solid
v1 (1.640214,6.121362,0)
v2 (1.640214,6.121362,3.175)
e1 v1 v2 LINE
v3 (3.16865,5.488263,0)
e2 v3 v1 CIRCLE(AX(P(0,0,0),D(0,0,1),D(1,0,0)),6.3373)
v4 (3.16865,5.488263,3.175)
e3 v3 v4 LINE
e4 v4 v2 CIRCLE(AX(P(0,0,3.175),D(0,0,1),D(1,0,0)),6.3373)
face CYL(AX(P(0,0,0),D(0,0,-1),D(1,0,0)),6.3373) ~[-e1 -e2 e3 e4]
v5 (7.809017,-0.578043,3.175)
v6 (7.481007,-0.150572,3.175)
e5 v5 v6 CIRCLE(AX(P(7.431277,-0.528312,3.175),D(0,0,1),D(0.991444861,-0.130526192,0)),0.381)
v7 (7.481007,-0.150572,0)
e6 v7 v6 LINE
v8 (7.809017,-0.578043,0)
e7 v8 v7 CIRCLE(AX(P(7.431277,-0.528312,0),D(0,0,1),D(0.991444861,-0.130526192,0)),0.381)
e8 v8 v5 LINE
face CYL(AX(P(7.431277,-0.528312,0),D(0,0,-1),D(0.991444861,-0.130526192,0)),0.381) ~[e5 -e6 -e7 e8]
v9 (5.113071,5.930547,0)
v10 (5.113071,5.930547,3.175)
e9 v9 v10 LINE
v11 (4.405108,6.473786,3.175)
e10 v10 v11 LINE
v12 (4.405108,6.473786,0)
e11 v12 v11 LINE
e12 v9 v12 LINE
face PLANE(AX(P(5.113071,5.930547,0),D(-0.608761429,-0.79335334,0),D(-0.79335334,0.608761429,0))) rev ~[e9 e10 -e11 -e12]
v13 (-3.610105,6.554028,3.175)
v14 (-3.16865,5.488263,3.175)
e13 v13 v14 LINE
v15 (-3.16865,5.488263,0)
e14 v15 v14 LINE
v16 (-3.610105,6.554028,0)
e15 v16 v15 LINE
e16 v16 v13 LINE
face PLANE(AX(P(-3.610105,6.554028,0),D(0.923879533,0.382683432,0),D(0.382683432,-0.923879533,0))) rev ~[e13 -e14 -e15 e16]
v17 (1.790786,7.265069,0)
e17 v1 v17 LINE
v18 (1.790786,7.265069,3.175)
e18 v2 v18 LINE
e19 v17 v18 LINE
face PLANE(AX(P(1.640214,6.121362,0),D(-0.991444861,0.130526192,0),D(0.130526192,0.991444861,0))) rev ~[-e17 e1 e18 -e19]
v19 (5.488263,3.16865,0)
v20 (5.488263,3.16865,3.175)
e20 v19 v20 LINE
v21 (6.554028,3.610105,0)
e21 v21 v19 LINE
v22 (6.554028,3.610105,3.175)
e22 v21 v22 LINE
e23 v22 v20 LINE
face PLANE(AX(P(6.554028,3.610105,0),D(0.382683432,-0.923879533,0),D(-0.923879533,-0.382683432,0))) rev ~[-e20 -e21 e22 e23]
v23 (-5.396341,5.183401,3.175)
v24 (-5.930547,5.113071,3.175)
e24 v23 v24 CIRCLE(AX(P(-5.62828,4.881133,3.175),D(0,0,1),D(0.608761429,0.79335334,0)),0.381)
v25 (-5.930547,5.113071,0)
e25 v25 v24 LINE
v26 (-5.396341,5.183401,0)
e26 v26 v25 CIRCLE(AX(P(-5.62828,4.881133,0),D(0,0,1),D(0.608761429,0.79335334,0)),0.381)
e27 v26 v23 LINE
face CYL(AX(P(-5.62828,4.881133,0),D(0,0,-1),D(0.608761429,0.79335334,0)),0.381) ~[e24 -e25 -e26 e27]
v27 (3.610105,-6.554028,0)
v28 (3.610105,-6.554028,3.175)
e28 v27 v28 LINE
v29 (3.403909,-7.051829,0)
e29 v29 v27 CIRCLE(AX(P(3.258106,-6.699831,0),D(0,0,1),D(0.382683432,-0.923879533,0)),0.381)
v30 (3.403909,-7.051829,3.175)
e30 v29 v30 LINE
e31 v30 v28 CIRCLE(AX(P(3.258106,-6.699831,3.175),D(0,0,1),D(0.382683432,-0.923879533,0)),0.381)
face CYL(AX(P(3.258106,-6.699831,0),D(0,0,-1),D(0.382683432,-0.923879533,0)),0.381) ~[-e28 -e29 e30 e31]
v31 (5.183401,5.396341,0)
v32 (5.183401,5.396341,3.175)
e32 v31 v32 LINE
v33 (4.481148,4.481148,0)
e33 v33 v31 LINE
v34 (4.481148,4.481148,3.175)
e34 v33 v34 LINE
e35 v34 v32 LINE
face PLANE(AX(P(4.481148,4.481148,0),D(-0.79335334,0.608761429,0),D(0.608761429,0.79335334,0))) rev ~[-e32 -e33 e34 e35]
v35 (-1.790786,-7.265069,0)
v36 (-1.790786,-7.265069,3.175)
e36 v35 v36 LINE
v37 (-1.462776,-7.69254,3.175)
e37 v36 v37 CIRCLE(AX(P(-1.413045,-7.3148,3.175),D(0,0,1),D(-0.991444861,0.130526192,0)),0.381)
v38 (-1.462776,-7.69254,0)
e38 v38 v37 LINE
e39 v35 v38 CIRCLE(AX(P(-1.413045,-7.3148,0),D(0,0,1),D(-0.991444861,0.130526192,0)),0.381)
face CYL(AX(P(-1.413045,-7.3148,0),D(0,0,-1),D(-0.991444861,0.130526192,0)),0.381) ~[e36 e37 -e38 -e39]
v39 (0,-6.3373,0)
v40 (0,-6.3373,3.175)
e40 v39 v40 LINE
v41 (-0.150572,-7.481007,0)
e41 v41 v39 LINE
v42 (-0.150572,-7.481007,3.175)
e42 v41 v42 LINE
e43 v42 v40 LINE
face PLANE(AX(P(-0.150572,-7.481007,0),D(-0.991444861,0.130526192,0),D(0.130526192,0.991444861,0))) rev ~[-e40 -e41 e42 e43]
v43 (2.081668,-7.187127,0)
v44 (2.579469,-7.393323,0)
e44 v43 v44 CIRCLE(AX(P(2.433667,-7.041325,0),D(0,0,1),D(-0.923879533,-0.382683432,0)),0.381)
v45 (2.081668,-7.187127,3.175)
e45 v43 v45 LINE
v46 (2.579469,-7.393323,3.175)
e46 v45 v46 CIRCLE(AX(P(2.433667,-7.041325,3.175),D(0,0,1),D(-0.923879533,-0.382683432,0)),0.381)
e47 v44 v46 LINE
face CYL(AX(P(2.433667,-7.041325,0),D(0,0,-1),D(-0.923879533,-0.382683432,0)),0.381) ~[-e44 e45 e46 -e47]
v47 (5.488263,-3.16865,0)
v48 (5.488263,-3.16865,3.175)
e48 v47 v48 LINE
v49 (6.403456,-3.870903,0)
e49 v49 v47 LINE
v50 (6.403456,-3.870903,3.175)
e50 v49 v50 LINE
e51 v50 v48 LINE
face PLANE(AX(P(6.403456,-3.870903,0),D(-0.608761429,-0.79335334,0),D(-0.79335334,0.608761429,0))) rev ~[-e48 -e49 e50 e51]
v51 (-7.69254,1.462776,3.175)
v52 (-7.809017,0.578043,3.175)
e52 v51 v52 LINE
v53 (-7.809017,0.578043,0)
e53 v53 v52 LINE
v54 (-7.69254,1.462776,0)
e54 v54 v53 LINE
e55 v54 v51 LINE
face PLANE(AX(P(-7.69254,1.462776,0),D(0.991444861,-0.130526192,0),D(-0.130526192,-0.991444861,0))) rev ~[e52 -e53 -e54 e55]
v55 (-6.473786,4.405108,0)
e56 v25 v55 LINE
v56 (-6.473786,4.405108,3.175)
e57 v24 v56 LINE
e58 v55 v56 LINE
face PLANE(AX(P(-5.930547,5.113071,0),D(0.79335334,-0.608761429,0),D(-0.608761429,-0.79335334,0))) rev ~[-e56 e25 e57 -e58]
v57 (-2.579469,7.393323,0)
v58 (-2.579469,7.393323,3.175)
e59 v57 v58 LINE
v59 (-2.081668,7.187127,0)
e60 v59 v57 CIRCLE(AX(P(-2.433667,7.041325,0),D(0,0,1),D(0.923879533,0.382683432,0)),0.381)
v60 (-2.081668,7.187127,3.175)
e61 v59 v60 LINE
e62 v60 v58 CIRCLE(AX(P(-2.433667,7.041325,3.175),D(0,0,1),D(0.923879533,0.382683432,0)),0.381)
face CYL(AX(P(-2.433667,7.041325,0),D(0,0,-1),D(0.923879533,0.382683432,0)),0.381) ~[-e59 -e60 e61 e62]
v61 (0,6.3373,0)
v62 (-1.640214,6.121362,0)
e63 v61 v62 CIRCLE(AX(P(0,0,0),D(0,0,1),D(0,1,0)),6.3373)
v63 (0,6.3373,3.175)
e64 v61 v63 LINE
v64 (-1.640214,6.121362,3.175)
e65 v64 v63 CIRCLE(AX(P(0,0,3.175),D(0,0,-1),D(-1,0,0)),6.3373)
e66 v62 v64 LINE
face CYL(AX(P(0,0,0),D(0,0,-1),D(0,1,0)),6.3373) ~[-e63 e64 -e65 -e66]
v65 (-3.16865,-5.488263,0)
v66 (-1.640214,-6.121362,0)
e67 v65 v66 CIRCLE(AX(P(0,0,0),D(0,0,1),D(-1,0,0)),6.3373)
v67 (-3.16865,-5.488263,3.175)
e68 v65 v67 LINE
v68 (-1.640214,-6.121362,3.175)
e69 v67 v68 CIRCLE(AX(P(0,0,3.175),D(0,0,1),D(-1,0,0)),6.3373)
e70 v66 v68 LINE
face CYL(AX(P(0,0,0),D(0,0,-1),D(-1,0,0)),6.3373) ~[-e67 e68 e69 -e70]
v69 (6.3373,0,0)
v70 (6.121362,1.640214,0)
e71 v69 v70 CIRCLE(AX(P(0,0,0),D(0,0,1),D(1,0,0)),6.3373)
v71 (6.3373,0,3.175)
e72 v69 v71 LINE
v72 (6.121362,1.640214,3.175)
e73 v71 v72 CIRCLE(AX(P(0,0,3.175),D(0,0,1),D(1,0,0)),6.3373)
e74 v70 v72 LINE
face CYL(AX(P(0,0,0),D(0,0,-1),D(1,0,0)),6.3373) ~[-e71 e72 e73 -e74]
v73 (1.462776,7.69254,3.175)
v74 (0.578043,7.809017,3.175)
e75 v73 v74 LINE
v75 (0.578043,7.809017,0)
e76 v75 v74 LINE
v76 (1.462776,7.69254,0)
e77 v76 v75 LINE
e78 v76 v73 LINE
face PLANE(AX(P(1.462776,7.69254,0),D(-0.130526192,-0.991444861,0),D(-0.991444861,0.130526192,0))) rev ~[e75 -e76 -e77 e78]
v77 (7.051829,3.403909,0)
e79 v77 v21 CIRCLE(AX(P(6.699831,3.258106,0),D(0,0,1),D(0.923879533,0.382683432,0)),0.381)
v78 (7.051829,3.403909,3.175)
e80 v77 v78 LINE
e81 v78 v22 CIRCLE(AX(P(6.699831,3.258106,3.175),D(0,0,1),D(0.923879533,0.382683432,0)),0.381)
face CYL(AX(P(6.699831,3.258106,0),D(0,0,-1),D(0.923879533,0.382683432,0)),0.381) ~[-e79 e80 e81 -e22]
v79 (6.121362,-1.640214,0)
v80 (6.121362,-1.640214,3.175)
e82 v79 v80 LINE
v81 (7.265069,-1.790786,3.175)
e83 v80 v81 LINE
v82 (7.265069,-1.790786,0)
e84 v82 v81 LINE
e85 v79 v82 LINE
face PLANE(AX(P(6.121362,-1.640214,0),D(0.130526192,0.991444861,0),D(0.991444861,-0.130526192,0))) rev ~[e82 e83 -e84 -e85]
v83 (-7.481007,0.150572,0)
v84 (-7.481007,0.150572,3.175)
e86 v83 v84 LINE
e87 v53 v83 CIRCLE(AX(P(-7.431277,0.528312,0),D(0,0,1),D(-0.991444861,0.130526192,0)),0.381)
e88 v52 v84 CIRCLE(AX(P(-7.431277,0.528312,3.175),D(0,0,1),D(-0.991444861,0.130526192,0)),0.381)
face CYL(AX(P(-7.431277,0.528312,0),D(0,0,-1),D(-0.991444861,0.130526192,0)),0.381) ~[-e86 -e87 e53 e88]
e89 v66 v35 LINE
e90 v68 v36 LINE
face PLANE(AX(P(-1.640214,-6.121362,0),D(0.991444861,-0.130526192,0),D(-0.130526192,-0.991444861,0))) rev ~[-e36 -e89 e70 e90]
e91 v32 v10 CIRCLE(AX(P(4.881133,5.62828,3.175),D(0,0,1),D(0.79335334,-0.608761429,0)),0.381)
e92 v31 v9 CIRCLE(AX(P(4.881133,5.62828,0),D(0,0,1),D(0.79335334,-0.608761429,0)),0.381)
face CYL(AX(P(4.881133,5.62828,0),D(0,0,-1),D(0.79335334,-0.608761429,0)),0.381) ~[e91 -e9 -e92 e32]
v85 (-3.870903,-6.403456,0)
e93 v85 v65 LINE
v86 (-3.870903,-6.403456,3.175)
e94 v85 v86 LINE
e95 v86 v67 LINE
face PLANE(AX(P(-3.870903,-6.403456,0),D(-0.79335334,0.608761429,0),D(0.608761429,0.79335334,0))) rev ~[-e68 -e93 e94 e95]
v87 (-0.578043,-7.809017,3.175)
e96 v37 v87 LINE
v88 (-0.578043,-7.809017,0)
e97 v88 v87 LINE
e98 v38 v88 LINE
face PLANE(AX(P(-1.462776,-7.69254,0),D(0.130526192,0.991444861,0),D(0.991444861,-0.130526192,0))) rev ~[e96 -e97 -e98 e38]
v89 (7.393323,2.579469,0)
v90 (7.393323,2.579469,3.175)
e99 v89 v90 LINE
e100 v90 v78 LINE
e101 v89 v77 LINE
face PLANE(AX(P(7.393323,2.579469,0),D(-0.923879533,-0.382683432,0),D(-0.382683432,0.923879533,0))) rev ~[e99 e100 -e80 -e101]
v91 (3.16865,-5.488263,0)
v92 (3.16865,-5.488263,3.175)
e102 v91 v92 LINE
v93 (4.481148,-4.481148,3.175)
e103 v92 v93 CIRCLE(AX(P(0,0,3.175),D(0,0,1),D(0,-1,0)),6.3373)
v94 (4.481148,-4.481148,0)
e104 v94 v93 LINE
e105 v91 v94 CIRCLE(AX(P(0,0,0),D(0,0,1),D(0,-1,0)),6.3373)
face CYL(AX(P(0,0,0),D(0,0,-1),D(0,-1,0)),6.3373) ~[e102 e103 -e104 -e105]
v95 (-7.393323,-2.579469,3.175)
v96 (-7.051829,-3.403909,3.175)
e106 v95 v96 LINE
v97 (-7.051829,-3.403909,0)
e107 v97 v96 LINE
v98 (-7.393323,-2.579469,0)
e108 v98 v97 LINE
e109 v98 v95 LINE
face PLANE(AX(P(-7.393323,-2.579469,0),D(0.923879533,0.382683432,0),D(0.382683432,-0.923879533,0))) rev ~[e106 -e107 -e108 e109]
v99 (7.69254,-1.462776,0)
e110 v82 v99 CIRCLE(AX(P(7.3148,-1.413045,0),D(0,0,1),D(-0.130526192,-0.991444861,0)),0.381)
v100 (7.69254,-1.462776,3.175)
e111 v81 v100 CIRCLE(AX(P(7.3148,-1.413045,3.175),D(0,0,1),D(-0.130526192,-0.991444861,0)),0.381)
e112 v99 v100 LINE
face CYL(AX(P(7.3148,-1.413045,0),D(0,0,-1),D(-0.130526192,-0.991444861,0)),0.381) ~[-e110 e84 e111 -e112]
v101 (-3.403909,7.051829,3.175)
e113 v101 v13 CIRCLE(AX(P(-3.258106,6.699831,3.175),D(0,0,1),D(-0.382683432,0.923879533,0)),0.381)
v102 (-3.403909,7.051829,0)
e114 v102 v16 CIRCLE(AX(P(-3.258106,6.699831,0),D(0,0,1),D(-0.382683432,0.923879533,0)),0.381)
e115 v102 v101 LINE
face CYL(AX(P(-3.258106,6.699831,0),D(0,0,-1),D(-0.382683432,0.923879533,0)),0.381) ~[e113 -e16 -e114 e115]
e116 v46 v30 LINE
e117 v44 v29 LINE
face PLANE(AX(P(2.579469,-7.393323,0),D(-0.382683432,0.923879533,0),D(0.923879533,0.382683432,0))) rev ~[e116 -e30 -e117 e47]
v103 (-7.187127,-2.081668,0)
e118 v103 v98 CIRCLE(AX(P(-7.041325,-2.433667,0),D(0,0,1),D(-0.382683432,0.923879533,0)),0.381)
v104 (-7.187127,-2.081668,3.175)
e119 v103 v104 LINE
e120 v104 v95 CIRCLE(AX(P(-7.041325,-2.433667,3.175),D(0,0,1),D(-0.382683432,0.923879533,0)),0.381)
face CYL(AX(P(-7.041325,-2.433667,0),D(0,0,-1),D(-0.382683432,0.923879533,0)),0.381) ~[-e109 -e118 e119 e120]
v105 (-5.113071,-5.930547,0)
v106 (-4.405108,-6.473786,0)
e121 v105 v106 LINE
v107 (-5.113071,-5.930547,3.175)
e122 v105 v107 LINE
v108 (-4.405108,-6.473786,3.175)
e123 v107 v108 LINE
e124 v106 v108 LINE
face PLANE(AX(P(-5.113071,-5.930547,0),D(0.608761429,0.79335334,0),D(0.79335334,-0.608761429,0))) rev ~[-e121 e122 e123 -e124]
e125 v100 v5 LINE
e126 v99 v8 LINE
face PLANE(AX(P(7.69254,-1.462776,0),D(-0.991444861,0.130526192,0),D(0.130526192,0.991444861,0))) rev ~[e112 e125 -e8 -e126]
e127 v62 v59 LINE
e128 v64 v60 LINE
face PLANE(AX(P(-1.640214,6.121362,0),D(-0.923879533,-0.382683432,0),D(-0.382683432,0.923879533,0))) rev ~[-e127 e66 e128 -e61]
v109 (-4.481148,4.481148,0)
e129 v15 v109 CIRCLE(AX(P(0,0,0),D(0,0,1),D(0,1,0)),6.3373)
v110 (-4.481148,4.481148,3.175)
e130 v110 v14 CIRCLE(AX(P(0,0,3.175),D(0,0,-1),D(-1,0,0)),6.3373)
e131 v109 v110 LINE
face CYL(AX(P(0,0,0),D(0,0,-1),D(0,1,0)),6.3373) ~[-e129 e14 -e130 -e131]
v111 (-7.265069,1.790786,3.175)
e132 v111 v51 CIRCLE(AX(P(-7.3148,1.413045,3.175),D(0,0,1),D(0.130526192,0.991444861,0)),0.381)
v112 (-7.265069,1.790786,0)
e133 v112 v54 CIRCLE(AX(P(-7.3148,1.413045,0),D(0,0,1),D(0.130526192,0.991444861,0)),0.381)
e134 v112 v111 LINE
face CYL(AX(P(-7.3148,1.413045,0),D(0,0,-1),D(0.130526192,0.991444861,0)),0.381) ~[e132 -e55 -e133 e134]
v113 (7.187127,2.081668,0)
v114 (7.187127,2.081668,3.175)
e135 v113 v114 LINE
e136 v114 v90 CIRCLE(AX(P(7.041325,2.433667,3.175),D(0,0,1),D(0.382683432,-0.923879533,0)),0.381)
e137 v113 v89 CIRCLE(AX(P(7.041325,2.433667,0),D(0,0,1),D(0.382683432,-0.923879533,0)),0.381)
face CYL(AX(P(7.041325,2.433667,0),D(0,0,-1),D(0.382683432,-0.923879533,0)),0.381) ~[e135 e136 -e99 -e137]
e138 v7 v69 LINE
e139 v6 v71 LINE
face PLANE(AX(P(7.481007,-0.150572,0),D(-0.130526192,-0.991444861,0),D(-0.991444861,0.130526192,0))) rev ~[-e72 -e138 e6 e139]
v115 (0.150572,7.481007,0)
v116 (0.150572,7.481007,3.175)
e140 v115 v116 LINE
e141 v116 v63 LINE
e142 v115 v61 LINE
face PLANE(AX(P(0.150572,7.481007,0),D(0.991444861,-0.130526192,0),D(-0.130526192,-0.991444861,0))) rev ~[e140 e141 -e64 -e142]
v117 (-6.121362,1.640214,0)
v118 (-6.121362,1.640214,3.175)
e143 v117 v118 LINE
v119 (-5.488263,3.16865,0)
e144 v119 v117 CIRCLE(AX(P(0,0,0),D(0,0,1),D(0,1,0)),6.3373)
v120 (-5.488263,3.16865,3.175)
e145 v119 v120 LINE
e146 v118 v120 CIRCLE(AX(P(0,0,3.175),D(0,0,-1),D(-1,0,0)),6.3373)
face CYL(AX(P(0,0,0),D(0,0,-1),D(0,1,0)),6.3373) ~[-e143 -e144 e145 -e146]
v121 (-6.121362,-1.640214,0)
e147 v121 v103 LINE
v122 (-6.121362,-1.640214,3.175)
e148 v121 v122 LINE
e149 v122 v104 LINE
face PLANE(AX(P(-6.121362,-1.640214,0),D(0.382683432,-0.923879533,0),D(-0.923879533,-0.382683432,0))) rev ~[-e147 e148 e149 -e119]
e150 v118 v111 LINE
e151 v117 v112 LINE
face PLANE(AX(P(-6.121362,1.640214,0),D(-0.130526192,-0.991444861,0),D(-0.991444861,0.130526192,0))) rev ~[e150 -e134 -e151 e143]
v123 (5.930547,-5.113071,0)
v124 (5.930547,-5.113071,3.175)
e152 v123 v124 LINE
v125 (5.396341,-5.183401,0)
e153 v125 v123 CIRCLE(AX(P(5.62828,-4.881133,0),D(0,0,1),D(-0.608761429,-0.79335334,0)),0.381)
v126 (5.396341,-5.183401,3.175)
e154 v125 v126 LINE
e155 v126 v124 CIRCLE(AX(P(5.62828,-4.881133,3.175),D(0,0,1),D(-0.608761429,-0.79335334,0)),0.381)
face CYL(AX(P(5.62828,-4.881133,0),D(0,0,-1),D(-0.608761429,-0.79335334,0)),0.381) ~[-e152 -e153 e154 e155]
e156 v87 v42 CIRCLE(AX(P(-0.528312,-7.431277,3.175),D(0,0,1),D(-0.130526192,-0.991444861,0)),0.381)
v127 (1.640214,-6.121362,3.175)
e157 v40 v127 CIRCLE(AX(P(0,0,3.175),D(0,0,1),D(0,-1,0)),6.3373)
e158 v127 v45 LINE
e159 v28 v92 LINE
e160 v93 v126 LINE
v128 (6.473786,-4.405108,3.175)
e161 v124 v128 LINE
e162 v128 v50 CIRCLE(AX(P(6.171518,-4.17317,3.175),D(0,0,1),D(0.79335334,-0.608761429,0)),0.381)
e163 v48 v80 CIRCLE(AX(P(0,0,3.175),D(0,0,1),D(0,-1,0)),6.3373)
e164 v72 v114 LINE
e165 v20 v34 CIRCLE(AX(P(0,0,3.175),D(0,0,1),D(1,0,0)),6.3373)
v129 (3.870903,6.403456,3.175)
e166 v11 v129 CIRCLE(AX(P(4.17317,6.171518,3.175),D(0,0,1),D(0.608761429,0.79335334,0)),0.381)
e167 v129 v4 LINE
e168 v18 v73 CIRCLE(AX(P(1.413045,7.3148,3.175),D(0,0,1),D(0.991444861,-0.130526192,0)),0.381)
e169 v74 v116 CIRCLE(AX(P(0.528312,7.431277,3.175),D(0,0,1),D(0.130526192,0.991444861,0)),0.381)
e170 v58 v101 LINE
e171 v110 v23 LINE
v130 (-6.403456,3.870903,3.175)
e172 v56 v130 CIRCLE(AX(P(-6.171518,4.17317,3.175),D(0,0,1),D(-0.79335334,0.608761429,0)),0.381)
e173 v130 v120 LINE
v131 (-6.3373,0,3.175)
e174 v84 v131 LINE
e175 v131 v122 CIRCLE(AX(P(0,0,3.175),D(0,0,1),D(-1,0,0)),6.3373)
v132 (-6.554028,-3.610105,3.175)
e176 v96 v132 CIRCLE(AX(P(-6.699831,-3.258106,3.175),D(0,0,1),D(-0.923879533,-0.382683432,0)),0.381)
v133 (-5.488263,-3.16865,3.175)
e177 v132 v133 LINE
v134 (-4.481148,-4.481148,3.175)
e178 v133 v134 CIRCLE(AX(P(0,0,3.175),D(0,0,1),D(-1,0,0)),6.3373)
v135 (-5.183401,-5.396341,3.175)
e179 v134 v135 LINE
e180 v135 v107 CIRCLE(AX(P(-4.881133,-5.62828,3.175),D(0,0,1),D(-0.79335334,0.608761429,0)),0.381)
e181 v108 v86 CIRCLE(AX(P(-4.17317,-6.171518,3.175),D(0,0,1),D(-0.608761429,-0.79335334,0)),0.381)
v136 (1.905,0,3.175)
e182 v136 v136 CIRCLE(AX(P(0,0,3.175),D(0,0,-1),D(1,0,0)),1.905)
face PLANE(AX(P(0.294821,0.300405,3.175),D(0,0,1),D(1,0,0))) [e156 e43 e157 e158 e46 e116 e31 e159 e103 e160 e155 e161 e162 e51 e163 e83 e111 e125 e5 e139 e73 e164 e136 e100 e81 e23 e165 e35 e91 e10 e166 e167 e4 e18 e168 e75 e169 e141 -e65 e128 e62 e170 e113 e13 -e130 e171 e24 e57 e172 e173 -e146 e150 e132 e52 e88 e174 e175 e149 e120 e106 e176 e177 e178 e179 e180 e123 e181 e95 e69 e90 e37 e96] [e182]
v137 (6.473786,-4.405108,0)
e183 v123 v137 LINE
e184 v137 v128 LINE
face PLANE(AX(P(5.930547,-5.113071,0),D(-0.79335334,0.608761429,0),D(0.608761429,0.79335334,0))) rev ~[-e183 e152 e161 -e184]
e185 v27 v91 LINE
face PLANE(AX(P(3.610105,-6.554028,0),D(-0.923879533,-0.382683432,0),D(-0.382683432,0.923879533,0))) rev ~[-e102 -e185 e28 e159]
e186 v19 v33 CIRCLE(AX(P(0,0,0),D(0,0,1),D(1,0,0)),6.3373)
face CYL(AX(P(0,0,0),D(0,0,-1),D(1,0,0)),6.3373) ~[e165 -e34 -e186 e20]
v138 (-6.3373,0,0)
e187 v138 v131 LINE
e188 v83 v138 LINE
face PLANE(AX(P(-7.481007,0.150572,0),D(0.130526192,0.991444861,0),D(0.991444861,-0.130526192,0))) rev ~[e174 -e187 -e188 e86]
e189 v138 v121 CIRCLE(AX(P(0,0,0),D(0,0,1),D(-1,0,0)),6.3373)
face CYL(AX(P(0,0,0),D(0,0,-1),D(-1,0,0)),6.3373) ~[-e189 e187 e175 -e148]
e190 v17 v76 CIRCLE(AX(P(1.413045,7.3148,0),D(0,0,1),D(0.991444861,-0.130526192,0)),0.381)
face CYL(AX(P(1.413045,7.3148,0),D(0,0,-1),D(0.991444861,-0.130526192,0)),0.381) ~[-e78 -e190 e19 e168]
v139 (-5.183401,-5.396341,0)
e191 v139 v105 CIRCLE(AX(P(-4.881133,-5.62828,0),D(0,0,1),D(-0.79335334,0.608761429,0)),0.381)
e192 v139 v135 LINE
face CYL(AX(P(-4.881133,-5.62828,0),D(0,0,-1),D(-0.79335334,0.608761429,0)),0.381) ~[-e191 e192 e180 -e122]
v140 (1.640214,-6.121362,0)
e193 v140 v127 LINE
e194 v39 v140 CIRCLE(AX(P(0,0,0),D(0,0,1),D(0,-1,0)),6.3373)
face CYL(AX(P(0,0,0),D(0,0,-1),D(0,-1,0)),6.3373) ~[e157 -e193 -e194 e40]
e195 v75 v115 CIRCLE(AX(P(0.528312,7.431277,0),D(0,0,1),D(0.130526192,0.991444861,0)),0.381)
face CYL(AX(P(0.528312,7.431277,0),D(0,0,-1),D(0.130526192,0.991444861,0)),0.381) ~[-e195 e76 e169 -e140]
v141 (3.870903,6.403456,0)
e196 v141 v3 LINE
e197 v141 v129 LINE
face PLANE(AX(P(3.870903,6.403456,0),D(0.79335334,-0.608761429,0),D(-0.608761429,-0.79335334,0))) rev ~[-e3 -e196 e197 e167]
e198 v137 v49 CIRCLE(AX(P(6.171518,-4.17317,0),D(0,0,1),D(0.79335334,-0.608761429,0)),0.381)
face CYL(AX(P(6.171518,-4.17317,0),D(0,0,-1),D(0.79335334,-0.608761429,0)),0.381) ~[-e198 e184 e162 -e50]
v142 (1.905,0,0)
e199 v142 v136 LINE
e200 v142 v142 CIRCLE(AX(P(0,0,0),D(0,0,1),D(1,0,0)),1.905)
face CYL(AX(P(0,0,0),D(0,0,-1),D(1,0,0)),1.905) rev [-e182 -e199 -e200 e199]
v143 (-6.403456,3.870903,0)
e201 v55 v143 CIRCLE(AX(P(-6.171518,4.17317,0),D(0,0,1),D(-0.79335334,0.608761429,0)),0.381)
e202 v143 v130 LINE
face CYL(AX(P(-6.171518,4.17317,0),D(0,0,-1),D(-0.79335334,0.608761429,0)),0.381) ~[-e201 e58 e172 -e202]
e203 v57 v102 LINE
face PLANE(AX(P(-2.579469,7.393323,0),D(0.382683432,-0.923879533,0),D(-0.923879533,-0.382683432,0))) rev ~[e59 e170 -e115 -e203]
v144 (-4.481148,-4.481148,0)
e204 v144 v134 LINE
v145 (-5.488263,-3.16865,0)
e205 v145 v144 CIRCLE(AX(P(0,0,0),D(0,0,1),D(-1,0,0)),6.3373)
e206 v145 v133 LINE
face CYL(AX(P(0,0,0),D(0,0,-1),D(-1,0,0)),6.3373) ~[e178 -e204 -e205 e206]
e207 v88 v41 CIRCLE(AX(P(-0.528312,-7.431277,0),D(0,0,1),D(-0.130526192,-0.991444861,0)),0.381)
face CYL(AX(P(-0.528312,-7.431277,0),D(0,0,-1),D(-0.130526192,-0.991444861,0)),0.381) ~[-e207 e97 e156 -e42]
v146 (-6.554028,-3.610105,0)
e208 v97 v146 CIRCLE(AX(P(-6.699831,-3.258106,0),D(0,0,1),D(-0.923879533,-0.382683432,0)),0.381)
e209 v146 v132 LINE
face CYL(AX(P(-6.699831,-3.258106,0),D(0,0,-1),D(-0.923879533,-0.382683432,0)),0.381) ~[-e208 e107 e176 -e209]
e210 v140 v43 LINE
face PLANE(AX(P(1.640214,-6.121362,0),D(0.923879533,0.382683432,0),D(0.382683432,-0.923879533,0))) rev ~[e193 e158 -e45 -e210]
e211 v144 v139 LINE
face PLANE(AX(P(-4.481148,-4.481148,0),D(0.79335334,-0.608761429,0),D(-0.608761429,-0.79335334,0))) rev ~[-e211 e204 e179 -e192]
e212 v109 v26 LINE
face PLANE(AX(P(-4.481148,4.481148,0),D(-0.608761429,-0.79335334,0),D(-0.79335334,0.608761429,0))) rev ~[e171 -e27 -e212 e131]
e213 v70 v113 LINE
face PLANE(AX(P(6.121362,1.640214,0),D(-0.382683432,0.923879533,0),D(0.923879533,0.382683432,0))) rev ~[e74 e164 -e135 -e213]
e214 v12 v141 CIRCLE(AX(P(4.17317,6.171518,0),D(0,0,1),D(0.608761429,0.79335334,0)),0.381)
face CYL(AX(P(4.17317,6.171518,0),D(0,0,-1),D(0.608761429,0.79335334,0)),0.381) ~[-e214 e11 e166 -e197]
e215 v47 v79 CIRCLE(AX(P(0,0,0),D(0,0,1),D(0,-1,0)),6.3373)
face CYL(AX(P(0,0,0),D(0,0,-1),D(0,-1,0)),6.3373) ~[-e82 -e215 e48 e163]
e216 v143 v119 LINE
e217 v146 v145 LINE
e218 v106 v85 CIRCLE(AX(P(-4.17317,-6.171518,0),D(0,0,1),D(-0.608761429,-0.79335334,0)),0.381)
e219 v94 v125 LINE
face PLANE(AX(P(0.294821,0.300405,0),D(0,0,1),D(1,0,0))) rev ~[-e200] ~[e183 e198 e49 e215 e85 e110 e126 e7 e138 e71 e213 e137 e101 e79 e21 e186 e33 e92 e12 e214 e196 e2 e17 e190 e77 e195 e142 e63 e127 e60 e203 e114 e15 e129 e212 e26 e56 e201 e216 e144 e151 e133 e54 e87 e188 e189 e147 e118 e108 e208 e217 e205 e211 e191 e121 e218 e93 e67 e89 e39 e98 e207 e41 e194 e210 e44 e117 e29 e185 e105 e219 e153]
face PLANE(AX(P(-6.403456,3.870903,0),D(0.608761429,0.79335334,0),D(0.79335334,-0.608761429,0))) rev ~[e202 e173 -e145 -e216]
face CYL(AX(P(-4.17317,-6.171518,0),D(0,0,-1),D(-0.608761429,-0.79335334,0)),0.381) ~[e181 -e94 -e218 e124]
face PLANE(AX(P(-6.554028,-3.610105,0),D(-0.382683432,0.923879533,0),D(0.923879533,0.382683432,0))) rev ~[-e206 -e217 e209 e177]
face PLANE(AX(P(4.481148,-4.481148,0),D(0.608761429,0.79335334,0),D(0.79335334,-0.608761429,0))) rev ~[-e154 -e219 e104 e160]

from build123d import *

# Parameters (mm, degrees)
F0_R     = 1.905
F1_DEPTH = 3.175
F2_COUNT = 12


# Not quite as in the source:
# - a length typed as a fraction of an inch, garbled in the dataset ("3 / 203.2 mm" for 3/8 in), is restored


with BuildPart() as f1:
    # F0 (on Top) → F1 (new body)
    with BuildSketch(Plane.XY):
        with BuildLine():
            ThreePointArc((0, 6.3373), (-4.4811478044, -4.4811478044), (6.3373, 0))
            ThreePointArc((6.3373, 0), (5.0277181234, 3.8579038041), (1.6402139345, 6.1213617389))
            ThreePointArc((1.6402139345, 6.1213617389), (0.827183638, 6.28308352), (0, 6.3373))
        make_face()
        Circle(F0_R, mode=Mode.SUBTRACT)
        with BuildLine():
            ThreePointArc((0, 6.3373), (0.827183638, 6.28308352), (1.6402139345, 6.1213617389))
            Line((1.6402139345, 6.1213617389), (1.7907858552, 7.2650690248))
            ThreePointArc((1.7907858552, 7.2650690248), (1.7153129857, 7.5467376085), (1.4627758423, 7.6925399962))
            Line((1.4627758423, 7.6925399962), (0.5780428921, 7.8090172988))
            ThreePointArc((0.5780428921, 7.8090172988), (0.2963743084, 7.7335444293), (0.1505719207, 7.4810072858))
            Line((0.1505719207, 7.4810072858), (0, 6.3373))
        make_face()
    extrude(amount=F1_DEPTH)

    # F2: F1 ×12 about axis
    f2_axis = Axis((0, 0, 0), (0, 0, -1))


with BuildPart() as f1_1:
    add(f1.part)
    for i in range(1, F2_COUNT):
        add(f1.part.rotate(f2_axis, i * 360 / F2_COUNT))


solid = f1_1.part
